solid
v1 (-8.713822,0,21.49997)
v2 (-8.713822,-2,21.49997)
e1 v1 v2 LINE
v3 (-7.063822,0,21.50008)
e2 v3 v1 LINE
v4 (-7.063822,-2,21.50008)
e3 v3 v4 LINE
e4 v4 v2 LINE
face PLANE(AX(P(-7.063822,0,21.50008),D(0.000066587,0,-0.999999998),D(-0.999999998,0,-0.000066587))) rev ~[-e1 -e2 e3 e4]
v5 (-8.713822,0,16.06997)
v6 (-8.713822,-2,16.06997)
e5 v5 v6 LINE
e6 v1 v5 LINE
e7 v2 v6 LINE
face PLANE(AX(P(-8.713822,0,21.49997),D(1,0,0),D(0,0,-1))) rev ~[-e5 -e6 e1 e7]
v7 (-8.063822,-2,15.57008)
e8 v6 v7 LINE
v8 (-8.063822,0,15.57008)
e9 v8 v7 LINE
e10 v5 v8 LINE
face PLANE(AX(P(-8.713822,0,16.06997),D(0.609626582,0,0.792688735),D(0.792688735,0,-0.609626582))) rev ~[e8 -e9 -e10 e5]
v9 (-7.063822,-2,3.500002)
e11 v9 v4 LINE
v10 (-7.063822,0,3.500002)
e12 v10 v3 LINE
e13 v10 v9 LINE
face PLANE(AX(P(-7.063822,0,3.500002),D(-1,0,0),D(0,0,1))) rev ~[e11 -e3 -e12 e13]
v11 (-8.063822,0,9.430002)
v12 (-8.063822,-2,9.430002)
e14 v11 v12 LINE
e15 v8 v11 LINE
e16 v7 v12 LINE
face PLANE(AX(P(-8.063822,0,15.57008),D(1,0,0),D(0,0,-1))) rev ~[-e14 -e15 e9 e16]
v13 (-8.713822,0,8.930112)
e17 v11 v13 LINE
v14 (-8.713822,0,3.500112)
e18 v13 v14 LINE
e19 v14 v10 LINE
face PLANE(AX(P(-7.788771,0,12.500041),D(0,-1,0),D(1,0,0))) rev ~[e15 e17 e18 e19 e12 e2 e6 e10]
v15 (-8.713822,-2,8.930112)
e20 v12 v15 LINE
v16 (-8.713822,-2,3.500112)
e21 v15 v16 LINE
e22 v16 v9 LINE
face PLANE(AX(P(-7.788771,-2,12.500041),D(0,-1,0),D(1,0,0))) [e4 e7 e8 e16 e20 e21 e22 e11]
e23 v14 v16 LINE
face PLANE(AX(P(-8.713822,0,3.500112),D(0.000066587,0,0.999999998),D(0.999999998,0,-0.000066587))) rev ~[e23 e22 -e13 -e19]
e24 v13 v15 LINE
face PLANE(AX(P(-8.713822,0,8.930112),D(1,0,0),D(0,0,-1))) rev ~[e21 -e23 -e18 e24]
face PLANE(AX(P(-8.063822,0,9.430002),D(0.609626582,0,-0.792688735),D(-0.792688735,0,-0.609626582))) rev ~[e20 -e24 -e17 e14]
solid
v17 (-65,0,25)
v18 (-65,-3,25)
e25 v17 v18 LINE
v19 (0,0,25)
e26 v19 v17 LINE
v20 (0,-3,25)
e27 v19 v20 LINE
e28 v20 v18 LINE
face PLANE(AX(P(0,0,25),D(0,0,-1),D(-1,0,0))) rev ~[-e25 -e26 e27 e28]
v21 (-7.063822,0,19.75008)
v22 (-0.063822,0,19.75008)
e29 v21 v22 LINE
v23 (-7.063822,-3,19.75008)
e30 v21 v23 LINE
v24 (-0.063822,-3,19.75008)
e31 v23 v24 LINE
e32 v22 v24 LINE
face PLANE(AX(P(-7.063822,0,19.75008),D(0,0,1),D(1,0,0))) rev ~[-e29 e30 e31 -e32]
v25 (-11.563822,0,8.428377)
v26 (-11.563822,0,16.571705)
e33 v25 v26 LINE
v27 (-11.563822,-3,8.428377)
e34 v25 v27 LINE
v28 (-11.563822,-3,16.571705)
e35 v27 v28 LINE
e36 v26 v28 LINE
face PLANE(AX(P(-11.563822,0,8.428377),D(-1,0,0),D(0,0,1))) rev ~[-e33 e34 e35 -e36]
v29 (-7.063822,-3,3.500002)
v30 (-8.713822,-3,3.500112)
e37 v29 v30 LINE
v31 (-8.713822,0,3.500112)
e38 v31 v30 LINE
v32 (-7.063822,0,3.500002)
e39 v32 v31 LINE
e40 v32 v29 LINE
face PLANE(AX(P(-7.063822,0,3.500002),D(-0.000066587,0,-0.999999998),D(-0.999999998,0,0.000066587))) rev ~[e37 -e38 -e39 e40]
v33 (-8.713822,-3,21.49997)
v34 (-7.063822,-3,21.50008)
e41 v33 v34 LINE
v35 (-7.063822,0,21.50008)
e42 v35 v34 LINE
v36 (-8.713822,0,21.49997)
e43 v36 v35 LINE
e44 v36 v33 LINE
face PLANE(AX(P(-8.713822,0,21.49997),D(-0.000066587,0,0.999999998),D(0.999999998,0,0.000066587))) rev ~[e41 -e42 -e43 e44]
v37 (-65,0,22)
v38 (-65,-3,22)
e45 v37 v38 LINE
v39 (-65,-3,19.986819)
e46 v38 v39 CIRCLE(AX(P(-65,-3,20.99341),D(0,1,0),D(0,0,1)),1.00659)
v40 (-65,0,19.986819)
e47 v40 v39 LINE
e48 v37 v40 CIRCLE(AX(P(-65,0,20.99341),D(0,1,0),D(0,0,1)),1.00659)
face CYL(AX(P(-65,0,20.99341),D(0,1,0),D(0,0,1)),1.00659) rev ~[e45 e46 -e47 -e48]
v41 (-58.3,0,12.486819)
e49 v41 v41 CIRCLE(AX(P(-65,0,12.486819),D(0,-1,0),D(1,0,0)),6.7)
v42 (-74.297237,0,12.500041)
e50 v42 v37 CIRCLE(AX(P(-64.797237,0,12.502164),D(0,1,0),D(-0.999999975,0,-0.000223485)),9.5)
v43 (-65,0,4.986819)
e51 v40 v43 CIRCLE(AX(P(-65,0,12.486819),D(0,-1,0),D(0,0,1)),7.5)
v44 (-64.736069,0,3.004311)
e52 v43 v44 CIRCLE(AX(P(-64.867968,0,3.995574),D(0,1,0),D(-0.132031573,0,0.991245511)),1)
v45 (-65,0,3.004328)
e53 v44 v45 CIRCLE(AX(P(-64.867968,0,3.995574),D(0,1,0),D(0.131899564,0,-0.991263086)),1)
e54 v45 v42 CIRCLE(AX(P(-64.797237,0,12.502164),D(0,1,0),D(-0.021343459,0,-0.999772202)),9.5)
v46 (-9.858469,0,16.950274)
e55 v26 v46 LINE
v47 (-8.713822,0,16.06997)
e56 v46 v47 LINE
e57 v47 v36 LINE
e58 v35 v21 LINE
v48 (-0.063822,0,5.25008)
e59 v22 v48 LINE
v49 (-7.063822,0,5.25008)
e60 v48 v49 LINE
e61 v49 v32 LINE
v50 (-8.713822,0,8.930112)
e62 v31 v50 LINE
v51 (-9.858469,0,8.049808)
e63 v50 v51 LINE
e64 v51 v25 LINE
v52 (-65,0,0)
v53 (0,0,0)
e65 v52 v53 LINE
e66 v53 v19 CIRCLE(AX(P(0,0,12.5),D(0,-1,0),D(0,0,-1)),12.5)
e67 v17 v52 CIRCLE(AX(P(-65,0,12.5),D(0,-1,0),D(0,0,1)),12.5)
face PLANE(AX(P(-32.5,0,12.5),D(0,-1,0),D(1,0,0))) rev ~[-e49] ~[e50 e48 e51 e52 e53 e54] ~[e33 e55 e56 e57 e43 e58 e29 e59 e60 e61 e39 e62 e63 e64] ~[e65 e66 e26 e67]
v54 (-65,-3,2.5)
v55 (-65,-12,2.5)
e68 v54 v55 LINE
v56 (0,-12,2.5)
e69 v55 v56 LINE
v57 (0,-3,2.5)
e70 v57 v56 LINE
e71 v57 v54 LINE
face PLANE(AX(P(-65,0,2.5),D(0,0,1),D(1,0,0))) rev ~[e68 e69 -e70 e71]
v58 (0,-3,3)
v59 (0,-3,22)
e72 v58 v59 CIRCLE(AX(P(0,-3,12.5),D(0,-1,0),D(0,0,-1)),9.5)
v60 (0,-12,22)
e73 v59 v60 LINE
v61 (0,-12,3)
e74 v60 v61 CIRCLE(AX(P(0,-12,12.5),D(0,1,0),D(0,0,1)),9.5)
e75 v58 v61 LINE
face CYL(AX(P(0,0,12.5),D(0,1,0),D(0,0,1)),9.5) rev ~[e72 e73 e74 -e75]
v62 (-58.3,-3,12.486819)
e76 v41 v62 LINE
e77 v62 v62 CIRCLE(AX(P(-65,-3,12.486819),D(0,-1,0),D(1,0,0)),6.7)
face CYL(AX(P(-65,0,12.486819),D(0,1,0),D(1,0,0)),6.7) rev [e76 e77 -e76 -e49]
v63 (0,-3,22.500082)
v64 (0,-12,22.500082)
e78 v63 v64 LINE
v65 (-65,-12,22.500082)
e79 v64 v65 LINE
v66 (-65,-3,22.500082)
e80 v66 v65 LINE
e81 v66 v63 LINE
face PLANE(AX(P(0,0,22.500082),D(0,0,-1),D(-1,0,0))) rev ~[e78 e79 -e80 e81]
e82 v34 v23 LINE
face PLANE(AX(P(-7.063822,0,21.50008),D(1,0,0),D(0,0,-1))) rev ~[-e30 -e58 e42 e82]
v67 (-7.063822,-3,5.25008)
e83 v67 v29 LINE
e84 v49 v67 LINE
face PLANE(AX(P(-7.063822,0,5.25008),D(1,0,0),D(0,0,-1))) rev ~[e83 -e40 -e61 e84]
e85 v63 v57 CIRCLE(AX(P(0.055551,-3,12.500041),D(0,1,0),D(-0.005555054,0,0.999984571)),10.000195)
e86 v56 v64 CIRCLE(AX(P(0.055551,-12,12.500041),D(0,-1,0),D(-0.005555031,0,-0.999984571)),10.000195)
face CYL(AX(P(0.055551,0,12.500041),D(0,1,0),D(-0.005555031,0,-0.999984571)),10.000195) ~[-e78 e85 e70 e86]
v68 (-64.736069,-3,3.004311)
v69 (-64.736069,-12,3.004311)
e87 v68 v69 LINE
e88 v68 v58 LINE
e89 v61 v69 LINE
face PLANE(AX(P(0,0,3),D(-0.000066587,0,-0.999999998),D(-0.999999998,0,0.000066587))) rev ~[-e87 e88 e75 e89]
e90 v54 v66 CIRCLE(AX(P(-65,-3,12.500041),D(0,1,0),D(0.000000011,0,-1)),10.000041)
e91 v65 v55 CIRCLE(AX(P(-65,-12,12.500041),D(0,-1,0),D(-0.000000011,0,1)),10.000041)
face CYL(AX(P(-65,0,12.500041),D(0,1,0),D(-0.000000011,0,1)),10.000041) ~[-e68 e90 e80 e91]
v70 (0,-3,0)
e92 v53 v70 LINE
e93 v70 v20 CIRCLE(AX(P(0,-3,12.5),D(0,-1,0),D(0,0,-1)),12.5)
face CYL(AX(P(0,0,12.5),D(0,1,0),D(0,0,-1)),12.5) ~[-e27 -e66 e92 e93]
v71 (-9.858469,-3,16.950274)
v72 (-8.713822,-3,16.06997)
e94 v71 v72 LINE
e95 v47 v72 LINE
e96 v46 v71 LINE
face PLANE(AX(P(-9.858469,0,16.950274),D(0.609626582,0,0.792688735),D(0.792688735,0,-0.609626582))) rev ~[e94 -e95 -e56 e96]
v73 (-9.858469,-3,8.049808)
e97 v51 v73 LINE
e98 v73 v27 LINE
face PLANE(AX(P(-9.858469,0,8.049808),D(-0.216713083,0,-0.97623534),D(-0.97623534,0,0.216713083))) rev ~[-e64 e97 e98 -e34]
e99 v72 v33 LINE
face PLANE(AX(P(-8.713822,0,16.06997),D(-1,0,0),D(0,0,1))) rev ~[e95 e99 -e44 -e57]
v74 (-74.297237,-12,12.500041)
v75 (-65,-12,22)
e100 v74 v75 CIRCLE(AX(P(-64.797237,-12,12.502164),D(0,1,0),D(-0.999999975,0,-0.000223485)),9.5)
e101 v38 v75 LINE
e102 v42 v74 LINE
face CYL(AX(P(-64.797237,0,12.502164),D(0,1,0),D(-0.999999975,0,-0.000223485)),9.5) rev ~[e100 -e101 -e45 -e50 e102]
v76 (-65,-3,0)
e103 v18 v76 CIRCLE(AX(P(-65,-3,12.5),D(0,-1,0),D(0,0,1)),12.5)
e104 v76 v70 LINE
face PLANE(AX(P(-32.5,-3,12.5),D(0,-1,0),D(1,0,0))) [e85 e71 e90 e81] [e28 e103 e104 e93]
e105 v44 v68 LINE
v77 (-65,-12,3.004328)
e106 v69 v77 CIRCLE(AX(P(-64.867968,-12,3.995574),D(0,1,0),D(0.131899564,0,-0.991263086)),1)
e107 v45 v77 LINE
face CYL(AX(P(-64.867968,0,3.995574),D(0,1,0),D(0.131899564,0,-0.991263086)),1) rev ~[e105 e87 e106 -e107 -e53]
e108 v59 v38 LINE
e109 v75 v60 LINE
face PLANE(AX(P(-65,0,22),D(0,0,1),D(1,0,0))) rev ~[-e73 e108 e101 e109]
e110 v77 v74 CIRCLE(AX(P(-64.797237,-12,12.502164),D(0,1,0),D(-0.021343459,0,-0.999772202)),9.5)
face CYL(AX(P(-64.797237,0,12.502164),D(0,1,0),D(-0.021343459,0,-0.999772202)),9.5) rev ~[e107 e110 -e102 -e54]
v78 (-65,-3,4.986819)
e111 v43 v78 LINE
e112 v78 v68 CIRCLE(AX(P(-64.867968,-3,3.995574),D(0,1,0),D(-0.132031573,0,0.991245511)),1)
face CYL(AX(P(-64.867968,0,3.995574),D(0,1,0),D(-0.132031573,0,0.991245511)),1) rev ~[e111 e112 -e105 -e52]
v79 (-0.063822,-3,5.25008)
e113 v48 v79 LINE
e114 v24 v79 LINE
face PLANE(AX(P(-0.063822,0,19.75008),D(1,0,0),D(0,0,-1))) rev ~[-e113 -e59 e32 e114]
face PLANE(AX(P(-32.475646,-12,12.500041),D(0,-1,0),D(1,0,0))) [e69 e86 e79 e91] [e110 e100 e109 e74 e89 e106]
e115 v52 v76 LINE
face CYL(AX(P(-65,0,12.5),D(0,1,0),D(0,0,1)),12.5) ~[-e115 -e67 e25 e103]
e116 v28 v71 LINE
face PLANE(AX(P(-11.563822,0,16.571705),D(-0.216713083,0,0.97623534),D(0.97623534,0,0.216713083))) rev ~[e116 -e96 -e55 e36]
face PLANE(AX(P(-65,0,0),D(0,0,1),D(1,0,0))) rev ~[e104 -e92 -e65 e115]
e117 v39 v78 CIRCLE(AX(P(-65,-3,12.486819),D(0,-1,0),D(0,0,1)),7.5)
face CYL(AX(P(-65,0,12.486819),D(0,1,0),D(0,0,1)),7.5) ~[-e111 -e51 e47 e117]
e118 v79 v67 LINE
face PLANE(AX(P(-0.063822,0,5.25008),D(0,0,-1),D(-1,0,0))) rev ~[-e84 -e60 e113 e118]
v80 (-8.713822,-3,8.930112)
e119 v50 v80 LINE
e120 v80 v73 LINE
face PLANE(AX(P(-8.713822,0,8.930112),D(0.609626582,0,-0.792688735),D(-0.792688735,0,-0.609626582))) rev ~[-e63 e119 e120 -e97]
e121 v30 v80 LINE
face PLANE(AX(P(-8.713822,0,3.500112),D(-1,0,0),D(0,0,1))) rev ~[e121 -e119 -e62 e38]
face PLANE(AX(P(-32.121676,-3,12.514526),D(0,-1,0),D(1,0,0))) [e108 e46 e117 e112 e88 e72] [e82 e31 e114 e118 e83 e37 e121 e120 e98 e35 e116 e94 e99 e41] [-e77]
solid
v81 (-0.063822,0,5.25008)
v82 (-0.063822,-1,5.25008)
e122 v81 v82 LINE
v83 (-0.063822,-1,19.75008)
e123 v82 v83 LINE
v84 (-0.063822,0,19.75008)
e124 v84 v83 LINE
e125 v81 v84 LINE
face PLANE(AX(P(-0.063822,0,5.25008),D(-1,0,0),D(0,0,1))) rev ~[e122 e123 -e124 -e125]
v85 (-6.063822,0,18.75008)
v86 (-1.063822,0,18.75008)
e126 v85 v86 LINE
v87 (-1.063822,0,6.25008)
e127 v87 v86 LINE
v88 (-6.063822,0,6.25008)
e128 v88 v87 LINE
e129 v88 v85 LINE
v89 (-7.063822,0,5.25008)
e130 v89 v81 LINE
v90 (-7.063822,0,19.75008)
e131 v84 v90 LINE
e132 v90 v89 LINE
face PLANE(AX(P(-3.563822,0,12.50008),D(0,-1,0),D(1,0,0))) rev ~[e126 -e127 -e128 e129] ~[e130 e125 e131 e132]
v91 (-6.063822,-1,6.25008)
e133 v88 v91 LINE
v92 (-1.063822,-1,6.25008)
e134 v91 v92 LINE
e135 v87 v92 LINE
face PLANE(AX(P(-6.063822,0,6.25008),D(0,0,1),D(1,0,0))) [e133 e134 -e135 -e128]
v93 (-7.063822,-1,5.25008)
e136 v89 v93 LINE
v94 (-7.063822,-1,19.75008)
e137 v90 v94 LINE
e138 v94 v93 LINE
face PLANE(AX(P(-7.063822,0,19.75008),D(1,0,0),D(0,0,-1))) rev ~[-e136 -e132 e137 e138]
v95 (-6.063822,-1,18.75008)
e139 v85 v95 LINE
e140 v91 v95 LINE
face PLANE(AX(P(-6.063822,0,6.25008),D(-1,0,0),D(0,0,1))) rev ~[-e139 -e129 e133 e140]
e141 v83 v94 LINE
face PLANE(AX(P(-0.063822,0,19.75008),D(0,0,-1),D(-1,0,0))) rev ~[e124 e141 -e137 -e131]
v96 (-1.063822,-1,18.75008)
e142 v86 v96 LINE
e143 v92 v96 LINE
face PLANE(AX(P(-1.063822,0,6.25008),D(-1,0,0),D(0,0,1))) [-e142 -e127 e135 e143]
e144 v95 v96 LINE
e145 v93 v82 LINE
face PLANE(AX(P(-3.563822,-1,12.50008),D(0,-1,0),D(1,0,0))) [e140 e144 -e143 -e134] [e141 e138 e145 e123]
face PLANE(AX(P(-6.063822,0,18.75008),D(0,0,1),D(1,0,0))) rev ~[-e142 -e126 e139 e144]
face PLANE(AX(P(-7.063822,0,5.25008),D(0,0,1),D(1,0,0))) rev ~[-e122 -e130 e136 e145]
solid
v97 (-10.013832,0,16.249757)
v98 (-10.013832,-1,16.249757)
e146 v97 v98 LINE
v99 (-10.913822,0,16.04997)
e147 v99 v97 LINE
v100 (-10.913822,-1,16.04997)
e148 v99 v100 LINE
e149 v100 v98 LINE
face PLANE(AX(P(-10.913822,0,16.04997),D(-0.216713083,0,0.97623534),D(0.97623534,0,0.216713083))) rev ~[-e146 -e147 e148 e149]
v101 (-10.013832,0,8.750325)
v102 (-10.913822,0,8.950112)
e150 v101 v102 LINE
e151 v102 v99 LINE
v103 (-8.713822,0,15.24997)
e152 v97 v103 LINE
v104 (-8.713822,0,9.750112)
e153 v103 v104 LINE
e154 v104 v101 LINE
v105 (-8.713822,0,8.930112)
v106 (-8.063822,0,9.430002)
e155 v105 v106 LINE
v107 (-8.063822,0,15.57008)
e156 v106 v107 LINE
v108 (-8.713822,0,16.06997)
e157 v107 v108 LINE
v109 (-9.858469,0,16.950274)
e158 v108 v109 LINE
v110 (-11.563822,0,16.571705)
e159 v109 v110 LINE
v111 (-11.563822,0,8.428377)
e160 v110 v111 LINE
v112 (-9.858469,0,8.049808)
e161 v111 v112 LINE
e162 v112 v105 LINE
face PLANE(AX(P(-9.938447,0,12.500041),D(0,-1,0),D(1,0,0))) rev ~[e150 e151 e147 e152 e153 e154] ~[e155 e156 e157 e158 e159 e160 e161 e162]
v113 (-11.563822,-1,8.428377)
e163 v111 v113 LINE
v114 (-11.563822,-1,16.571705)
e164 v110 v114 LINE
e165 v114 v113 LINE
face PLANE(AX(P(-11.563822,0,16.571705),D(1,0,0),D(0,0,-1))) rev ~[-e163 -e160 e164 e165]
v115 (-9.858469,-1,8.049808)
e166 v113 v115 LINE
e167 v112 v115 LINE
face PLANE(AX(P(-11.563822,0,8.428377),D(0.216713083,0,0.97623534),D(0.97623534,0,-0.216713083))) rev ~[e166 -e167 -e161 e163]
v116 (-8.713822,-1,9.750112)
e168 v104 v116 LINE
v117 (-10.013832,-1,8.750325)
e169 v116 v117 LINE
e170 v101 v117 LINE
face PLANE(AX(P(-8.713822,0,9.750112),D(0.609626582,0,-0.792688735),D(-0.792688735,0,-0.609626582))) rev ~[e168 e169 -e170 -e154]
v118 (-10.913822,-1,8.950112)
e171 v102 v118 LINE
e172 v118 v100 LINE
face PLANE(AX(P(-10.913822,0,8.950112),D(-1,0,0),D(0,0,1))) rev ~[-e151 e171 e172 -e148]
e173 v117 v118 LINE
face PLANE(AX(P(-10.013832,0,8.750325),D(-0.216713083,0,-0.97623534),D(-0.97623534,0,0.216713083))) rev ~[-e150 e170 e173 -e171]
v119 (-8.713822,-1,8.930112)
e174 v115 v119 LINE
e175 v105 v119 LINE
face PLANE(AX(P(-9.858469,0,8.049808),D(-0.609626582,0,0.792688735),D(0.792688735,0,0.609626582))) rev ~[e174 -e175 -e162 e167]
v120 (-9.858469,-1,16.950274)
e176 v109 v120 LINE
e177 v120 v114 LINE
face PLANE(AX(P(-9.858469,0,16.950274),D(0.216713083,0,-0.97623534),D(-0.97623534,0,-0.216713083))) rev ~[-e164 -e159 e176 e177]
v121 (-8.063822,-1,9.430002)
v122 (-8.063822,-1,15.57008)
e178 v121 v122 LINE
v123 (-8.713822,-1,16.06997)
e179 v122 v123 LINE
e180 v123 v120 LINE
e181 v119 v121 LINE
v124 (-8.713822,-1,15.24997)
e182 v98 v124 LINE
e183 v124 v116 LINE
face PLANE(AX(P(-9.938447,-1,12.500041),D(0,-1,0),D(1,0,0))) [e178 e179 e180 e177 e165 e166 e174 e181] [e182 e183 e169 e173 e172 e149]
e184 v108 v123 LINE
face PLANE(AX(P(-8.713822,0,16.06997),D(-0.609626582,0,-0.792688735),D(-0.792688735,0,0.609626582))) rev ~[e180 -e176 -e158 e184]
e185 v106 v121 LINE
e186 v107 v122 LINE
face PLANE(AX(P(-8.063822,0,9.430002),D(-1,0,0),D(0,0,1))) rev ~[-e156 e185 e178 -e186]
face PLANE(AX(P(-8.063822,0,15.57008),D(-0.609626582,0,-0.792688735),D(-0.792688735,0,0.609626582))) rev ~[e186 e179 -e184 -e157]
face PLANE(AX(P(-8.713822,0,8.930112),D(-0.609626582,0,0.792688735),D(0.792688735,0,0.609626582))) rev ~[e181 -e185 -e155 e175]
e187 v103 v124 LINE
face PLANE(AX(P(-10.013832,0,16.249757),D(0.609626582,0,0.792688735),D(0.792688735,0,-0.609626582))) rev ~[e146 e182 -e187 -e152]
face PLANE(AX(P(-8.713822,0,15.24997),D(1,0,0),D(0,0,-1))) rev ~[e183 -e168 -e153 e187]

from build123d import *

# Parameters (mm, degrees)
F0_R     = 6.7
F1_DEPTH = 3
F2_DEPTH = 2
F0_W     = 5
F0_H     = 12.5
F3_DEPTH = 1
F4_DEPTH = 12


# Not quite as in the source:
# - ends of sketch curves that miss each other by under 0.0002 mm in the source are joined
# - a feature names something its author has since deleted; it is built from what else it names


with BuildPart() as f1:
    # F0 (on Front) → F1 (new body)
    with BuildSketch(Plane.XZ):
        with BuildLine():
            ThreePointArc((-65, 22), (-63.9934095883, 20.9934095883), (-65, 19.9868191765))
            ThreePointArc((-65, 19.9868191765), (-72.5, 12.4868191765), (-65, 4.9868191765))
            ThreePointArc((-65, 4.9868191765), (-63.8767141262, 4.1275392339), (-64.7360688632, 3.0043105795))
            Line((-64.7360688632, 3.0043105795), (0, 3))
            ThreePointArc((0, 3), (9.5, 12.5), (0, 22))
            Line((0, 22), (-65, 22))
        make_face()
        with Locations((-65, 12.4868191765)):
            Circle(F0_R, mode=Mode.SUBTRACT)
        Polygon((-7.0638221186, 19.7500795352), (-0.0638221186, 19.7500795352), (-0.0638221186, 5.2500795352), (-7.0638221186, 5.2500795352), (-7.0638221186, 3.5000024036), (-8.713822115, 3.5001122721), (-8.713822115, 8.9301122721), (-9.8584694148, 8.0498078222), (-11.5638221186, 8.4283766224), (-11.5638221186, 12.5000409694), (-11.5638221186, 16.5717053165), (-9.8584694148, 16.9502741166), (-8.713822115, 16.0699696667), (-8.713822115, 21.4999696667), (-7.0638221186, 21.5000795352), align=None, mode=Mode.SUBTRACT)
    extrude(amount=F1_DEPTH)



with BuildPart() as f1b:
    # F0 (on Front) → F1, piece 2 (new body)
    with BuildSketch(Plane.XZ):
        with BuildLine():
            Line((-65, 0), (0, 0))
            ThreePointArc((0, 0), (12.5, 12.5), (0, 25))
            Line((0, 25), (-65, 25))
            ThreePointArc((-65, 25), (-77.5, 12.5), (-65, 0))
        make_face()
        with BuildLine():
            ThreePointArc((-2.276e-07, 22.5000819376), (10.0557466602, 12.5000410832), (0, 2.5))
            Line((0, 2.5), (-65, 2.5))
            ThreePointArc((-65, 2.5), (-75.0000410826, 12.500040855), (-65.0000002276, 22.5000819376))
            Line((-65.0000002276, 22.5000819376), (-2.276e-07, 22.5000819376))
        make_face(mode=Mode.SUBTRACT)
    extrude(amount=F1_DEPTH)


with BuildPart() as f2:
    # F0 (on Front) → F2 (new body)
    with BuildSketch(Plane.XZ):
        Polygon((-7.0638221186, 12.5000795352), (-7.0638221186, 19.7500795352), (-7.0638221186, 21.5000795352), (-8.713822115, 21.4999696667), (-8.713822115, 16.0699696667), (-8.0638221186, 15.5700795352), (-8.0638221186, 9.4300024036), (-8.713822115, 8.9301122721), (-8.713822115, 3.5001122721), (-7.0638221186, 3.5000024036), (-7.0638221186, 5.2500024036), (-7.0638221186, 9.4300024036), align=None)
    extrude(amount=F2_DEPTH)


with BuildPart() as f3:
    # F0 (on Front) → F3 (new body)
    with BuildSketch(Plane.XZ):
        Polygon((-0.0638221186, 5.2500795352), (-0.0638221186, 19.7500795352), (-7.0638221186, 19.7500795352), (-7.0638221186, 12.5000795352), (-7.0638221186, 9.4300024036), (-7.0638221186, 5.2500795352), align=None)
        with Locations((-3.5638221186, 12.5000795352)):
            Rectangle(F0_W, F0_H, mode=Mode.SUBTRACT)
    extrude(amount=F3_DEPTH)


with BuildPart() as f3b:
    # F0 (on Front) → F3, piece 2 (new body)
    with BuildSketch(Plane.XZ):
        Polygon((-8.0638221186, 15.5700795352), (-8.713822115, 16.0699696667), (-9.8584694148, 16.9502741166), (-11.5638221186, 16.5717053165), (-11.5638221186, 12.5000409694), (-11.5638221186, 8.4283766224), (-9.8584694148, 8.0498078222), (-8.713822115, 8.9301122721), (-8.0638221186, 9.4300024036), align=None)
        Polygon((-10.0138316441, 16.249757261), (-8.7138221186, 15.2499696667), (-8.7138221186, 9.7501122721), (-10.0138316441, 8.7503246778), (-10.9138221186, 8.9501122721), (-10.9138221186, 9.7501122721), (-10.9138221186, 16.0499696667), align=None, mode=Mode.SUBTRACT)
    extrude(amount=F3_DEPTH)


with BuildPart() as f1_1:
    add(f1.part)

    add(f1b.part)  # F4 merges F1b
    # F0 (on Front) → F4 (join)
    with BuildSketch(Plane.XZ):
        with BuildLine():
            Line((-65, 2.5), (0, 2.5))
            ThreePointArc((0, 2.5), (10.0557466602, 12.5000410832), (-2.276e-07, 22.5000819376))
            Line((-2.276e-07, 22.5000819376), (-65.0000002276, 22.5000819376))
            ThreePointArc((-65.0000002276, 22.5000819376), (-75.0000410826, 12.500040855), (-65, 2.5))
        make_face()
        with BuildLine():
            ThreePointArc((-74.2972368995, 12.5000409694), (-71.5868031052, 19.1468457066), (-65, 22))
            Line((-65, 22), (0, 22))
            ThreePointArc((0, 22), (9.5, 12.5), (0, 3))
            Line((0, 3), (-64.7360688632, 3.0043105795))
            ThreePointArc((-64.7360688632, 3.0043105795), (-64.8680350139, 2.9955736674), (-65, 3.0043281539))
            ThreePointArc((-65, 3.0043281539), (-71.5853179489, 5.855965247), (-74.2972368995, 12.5000409694))
        make_face(mode=Mode.SUBTRACT)
    extrude(amount=F4_DEPTH)


solid = Compound([f2.part, f3.part, f3b.part, f1_1.part])
